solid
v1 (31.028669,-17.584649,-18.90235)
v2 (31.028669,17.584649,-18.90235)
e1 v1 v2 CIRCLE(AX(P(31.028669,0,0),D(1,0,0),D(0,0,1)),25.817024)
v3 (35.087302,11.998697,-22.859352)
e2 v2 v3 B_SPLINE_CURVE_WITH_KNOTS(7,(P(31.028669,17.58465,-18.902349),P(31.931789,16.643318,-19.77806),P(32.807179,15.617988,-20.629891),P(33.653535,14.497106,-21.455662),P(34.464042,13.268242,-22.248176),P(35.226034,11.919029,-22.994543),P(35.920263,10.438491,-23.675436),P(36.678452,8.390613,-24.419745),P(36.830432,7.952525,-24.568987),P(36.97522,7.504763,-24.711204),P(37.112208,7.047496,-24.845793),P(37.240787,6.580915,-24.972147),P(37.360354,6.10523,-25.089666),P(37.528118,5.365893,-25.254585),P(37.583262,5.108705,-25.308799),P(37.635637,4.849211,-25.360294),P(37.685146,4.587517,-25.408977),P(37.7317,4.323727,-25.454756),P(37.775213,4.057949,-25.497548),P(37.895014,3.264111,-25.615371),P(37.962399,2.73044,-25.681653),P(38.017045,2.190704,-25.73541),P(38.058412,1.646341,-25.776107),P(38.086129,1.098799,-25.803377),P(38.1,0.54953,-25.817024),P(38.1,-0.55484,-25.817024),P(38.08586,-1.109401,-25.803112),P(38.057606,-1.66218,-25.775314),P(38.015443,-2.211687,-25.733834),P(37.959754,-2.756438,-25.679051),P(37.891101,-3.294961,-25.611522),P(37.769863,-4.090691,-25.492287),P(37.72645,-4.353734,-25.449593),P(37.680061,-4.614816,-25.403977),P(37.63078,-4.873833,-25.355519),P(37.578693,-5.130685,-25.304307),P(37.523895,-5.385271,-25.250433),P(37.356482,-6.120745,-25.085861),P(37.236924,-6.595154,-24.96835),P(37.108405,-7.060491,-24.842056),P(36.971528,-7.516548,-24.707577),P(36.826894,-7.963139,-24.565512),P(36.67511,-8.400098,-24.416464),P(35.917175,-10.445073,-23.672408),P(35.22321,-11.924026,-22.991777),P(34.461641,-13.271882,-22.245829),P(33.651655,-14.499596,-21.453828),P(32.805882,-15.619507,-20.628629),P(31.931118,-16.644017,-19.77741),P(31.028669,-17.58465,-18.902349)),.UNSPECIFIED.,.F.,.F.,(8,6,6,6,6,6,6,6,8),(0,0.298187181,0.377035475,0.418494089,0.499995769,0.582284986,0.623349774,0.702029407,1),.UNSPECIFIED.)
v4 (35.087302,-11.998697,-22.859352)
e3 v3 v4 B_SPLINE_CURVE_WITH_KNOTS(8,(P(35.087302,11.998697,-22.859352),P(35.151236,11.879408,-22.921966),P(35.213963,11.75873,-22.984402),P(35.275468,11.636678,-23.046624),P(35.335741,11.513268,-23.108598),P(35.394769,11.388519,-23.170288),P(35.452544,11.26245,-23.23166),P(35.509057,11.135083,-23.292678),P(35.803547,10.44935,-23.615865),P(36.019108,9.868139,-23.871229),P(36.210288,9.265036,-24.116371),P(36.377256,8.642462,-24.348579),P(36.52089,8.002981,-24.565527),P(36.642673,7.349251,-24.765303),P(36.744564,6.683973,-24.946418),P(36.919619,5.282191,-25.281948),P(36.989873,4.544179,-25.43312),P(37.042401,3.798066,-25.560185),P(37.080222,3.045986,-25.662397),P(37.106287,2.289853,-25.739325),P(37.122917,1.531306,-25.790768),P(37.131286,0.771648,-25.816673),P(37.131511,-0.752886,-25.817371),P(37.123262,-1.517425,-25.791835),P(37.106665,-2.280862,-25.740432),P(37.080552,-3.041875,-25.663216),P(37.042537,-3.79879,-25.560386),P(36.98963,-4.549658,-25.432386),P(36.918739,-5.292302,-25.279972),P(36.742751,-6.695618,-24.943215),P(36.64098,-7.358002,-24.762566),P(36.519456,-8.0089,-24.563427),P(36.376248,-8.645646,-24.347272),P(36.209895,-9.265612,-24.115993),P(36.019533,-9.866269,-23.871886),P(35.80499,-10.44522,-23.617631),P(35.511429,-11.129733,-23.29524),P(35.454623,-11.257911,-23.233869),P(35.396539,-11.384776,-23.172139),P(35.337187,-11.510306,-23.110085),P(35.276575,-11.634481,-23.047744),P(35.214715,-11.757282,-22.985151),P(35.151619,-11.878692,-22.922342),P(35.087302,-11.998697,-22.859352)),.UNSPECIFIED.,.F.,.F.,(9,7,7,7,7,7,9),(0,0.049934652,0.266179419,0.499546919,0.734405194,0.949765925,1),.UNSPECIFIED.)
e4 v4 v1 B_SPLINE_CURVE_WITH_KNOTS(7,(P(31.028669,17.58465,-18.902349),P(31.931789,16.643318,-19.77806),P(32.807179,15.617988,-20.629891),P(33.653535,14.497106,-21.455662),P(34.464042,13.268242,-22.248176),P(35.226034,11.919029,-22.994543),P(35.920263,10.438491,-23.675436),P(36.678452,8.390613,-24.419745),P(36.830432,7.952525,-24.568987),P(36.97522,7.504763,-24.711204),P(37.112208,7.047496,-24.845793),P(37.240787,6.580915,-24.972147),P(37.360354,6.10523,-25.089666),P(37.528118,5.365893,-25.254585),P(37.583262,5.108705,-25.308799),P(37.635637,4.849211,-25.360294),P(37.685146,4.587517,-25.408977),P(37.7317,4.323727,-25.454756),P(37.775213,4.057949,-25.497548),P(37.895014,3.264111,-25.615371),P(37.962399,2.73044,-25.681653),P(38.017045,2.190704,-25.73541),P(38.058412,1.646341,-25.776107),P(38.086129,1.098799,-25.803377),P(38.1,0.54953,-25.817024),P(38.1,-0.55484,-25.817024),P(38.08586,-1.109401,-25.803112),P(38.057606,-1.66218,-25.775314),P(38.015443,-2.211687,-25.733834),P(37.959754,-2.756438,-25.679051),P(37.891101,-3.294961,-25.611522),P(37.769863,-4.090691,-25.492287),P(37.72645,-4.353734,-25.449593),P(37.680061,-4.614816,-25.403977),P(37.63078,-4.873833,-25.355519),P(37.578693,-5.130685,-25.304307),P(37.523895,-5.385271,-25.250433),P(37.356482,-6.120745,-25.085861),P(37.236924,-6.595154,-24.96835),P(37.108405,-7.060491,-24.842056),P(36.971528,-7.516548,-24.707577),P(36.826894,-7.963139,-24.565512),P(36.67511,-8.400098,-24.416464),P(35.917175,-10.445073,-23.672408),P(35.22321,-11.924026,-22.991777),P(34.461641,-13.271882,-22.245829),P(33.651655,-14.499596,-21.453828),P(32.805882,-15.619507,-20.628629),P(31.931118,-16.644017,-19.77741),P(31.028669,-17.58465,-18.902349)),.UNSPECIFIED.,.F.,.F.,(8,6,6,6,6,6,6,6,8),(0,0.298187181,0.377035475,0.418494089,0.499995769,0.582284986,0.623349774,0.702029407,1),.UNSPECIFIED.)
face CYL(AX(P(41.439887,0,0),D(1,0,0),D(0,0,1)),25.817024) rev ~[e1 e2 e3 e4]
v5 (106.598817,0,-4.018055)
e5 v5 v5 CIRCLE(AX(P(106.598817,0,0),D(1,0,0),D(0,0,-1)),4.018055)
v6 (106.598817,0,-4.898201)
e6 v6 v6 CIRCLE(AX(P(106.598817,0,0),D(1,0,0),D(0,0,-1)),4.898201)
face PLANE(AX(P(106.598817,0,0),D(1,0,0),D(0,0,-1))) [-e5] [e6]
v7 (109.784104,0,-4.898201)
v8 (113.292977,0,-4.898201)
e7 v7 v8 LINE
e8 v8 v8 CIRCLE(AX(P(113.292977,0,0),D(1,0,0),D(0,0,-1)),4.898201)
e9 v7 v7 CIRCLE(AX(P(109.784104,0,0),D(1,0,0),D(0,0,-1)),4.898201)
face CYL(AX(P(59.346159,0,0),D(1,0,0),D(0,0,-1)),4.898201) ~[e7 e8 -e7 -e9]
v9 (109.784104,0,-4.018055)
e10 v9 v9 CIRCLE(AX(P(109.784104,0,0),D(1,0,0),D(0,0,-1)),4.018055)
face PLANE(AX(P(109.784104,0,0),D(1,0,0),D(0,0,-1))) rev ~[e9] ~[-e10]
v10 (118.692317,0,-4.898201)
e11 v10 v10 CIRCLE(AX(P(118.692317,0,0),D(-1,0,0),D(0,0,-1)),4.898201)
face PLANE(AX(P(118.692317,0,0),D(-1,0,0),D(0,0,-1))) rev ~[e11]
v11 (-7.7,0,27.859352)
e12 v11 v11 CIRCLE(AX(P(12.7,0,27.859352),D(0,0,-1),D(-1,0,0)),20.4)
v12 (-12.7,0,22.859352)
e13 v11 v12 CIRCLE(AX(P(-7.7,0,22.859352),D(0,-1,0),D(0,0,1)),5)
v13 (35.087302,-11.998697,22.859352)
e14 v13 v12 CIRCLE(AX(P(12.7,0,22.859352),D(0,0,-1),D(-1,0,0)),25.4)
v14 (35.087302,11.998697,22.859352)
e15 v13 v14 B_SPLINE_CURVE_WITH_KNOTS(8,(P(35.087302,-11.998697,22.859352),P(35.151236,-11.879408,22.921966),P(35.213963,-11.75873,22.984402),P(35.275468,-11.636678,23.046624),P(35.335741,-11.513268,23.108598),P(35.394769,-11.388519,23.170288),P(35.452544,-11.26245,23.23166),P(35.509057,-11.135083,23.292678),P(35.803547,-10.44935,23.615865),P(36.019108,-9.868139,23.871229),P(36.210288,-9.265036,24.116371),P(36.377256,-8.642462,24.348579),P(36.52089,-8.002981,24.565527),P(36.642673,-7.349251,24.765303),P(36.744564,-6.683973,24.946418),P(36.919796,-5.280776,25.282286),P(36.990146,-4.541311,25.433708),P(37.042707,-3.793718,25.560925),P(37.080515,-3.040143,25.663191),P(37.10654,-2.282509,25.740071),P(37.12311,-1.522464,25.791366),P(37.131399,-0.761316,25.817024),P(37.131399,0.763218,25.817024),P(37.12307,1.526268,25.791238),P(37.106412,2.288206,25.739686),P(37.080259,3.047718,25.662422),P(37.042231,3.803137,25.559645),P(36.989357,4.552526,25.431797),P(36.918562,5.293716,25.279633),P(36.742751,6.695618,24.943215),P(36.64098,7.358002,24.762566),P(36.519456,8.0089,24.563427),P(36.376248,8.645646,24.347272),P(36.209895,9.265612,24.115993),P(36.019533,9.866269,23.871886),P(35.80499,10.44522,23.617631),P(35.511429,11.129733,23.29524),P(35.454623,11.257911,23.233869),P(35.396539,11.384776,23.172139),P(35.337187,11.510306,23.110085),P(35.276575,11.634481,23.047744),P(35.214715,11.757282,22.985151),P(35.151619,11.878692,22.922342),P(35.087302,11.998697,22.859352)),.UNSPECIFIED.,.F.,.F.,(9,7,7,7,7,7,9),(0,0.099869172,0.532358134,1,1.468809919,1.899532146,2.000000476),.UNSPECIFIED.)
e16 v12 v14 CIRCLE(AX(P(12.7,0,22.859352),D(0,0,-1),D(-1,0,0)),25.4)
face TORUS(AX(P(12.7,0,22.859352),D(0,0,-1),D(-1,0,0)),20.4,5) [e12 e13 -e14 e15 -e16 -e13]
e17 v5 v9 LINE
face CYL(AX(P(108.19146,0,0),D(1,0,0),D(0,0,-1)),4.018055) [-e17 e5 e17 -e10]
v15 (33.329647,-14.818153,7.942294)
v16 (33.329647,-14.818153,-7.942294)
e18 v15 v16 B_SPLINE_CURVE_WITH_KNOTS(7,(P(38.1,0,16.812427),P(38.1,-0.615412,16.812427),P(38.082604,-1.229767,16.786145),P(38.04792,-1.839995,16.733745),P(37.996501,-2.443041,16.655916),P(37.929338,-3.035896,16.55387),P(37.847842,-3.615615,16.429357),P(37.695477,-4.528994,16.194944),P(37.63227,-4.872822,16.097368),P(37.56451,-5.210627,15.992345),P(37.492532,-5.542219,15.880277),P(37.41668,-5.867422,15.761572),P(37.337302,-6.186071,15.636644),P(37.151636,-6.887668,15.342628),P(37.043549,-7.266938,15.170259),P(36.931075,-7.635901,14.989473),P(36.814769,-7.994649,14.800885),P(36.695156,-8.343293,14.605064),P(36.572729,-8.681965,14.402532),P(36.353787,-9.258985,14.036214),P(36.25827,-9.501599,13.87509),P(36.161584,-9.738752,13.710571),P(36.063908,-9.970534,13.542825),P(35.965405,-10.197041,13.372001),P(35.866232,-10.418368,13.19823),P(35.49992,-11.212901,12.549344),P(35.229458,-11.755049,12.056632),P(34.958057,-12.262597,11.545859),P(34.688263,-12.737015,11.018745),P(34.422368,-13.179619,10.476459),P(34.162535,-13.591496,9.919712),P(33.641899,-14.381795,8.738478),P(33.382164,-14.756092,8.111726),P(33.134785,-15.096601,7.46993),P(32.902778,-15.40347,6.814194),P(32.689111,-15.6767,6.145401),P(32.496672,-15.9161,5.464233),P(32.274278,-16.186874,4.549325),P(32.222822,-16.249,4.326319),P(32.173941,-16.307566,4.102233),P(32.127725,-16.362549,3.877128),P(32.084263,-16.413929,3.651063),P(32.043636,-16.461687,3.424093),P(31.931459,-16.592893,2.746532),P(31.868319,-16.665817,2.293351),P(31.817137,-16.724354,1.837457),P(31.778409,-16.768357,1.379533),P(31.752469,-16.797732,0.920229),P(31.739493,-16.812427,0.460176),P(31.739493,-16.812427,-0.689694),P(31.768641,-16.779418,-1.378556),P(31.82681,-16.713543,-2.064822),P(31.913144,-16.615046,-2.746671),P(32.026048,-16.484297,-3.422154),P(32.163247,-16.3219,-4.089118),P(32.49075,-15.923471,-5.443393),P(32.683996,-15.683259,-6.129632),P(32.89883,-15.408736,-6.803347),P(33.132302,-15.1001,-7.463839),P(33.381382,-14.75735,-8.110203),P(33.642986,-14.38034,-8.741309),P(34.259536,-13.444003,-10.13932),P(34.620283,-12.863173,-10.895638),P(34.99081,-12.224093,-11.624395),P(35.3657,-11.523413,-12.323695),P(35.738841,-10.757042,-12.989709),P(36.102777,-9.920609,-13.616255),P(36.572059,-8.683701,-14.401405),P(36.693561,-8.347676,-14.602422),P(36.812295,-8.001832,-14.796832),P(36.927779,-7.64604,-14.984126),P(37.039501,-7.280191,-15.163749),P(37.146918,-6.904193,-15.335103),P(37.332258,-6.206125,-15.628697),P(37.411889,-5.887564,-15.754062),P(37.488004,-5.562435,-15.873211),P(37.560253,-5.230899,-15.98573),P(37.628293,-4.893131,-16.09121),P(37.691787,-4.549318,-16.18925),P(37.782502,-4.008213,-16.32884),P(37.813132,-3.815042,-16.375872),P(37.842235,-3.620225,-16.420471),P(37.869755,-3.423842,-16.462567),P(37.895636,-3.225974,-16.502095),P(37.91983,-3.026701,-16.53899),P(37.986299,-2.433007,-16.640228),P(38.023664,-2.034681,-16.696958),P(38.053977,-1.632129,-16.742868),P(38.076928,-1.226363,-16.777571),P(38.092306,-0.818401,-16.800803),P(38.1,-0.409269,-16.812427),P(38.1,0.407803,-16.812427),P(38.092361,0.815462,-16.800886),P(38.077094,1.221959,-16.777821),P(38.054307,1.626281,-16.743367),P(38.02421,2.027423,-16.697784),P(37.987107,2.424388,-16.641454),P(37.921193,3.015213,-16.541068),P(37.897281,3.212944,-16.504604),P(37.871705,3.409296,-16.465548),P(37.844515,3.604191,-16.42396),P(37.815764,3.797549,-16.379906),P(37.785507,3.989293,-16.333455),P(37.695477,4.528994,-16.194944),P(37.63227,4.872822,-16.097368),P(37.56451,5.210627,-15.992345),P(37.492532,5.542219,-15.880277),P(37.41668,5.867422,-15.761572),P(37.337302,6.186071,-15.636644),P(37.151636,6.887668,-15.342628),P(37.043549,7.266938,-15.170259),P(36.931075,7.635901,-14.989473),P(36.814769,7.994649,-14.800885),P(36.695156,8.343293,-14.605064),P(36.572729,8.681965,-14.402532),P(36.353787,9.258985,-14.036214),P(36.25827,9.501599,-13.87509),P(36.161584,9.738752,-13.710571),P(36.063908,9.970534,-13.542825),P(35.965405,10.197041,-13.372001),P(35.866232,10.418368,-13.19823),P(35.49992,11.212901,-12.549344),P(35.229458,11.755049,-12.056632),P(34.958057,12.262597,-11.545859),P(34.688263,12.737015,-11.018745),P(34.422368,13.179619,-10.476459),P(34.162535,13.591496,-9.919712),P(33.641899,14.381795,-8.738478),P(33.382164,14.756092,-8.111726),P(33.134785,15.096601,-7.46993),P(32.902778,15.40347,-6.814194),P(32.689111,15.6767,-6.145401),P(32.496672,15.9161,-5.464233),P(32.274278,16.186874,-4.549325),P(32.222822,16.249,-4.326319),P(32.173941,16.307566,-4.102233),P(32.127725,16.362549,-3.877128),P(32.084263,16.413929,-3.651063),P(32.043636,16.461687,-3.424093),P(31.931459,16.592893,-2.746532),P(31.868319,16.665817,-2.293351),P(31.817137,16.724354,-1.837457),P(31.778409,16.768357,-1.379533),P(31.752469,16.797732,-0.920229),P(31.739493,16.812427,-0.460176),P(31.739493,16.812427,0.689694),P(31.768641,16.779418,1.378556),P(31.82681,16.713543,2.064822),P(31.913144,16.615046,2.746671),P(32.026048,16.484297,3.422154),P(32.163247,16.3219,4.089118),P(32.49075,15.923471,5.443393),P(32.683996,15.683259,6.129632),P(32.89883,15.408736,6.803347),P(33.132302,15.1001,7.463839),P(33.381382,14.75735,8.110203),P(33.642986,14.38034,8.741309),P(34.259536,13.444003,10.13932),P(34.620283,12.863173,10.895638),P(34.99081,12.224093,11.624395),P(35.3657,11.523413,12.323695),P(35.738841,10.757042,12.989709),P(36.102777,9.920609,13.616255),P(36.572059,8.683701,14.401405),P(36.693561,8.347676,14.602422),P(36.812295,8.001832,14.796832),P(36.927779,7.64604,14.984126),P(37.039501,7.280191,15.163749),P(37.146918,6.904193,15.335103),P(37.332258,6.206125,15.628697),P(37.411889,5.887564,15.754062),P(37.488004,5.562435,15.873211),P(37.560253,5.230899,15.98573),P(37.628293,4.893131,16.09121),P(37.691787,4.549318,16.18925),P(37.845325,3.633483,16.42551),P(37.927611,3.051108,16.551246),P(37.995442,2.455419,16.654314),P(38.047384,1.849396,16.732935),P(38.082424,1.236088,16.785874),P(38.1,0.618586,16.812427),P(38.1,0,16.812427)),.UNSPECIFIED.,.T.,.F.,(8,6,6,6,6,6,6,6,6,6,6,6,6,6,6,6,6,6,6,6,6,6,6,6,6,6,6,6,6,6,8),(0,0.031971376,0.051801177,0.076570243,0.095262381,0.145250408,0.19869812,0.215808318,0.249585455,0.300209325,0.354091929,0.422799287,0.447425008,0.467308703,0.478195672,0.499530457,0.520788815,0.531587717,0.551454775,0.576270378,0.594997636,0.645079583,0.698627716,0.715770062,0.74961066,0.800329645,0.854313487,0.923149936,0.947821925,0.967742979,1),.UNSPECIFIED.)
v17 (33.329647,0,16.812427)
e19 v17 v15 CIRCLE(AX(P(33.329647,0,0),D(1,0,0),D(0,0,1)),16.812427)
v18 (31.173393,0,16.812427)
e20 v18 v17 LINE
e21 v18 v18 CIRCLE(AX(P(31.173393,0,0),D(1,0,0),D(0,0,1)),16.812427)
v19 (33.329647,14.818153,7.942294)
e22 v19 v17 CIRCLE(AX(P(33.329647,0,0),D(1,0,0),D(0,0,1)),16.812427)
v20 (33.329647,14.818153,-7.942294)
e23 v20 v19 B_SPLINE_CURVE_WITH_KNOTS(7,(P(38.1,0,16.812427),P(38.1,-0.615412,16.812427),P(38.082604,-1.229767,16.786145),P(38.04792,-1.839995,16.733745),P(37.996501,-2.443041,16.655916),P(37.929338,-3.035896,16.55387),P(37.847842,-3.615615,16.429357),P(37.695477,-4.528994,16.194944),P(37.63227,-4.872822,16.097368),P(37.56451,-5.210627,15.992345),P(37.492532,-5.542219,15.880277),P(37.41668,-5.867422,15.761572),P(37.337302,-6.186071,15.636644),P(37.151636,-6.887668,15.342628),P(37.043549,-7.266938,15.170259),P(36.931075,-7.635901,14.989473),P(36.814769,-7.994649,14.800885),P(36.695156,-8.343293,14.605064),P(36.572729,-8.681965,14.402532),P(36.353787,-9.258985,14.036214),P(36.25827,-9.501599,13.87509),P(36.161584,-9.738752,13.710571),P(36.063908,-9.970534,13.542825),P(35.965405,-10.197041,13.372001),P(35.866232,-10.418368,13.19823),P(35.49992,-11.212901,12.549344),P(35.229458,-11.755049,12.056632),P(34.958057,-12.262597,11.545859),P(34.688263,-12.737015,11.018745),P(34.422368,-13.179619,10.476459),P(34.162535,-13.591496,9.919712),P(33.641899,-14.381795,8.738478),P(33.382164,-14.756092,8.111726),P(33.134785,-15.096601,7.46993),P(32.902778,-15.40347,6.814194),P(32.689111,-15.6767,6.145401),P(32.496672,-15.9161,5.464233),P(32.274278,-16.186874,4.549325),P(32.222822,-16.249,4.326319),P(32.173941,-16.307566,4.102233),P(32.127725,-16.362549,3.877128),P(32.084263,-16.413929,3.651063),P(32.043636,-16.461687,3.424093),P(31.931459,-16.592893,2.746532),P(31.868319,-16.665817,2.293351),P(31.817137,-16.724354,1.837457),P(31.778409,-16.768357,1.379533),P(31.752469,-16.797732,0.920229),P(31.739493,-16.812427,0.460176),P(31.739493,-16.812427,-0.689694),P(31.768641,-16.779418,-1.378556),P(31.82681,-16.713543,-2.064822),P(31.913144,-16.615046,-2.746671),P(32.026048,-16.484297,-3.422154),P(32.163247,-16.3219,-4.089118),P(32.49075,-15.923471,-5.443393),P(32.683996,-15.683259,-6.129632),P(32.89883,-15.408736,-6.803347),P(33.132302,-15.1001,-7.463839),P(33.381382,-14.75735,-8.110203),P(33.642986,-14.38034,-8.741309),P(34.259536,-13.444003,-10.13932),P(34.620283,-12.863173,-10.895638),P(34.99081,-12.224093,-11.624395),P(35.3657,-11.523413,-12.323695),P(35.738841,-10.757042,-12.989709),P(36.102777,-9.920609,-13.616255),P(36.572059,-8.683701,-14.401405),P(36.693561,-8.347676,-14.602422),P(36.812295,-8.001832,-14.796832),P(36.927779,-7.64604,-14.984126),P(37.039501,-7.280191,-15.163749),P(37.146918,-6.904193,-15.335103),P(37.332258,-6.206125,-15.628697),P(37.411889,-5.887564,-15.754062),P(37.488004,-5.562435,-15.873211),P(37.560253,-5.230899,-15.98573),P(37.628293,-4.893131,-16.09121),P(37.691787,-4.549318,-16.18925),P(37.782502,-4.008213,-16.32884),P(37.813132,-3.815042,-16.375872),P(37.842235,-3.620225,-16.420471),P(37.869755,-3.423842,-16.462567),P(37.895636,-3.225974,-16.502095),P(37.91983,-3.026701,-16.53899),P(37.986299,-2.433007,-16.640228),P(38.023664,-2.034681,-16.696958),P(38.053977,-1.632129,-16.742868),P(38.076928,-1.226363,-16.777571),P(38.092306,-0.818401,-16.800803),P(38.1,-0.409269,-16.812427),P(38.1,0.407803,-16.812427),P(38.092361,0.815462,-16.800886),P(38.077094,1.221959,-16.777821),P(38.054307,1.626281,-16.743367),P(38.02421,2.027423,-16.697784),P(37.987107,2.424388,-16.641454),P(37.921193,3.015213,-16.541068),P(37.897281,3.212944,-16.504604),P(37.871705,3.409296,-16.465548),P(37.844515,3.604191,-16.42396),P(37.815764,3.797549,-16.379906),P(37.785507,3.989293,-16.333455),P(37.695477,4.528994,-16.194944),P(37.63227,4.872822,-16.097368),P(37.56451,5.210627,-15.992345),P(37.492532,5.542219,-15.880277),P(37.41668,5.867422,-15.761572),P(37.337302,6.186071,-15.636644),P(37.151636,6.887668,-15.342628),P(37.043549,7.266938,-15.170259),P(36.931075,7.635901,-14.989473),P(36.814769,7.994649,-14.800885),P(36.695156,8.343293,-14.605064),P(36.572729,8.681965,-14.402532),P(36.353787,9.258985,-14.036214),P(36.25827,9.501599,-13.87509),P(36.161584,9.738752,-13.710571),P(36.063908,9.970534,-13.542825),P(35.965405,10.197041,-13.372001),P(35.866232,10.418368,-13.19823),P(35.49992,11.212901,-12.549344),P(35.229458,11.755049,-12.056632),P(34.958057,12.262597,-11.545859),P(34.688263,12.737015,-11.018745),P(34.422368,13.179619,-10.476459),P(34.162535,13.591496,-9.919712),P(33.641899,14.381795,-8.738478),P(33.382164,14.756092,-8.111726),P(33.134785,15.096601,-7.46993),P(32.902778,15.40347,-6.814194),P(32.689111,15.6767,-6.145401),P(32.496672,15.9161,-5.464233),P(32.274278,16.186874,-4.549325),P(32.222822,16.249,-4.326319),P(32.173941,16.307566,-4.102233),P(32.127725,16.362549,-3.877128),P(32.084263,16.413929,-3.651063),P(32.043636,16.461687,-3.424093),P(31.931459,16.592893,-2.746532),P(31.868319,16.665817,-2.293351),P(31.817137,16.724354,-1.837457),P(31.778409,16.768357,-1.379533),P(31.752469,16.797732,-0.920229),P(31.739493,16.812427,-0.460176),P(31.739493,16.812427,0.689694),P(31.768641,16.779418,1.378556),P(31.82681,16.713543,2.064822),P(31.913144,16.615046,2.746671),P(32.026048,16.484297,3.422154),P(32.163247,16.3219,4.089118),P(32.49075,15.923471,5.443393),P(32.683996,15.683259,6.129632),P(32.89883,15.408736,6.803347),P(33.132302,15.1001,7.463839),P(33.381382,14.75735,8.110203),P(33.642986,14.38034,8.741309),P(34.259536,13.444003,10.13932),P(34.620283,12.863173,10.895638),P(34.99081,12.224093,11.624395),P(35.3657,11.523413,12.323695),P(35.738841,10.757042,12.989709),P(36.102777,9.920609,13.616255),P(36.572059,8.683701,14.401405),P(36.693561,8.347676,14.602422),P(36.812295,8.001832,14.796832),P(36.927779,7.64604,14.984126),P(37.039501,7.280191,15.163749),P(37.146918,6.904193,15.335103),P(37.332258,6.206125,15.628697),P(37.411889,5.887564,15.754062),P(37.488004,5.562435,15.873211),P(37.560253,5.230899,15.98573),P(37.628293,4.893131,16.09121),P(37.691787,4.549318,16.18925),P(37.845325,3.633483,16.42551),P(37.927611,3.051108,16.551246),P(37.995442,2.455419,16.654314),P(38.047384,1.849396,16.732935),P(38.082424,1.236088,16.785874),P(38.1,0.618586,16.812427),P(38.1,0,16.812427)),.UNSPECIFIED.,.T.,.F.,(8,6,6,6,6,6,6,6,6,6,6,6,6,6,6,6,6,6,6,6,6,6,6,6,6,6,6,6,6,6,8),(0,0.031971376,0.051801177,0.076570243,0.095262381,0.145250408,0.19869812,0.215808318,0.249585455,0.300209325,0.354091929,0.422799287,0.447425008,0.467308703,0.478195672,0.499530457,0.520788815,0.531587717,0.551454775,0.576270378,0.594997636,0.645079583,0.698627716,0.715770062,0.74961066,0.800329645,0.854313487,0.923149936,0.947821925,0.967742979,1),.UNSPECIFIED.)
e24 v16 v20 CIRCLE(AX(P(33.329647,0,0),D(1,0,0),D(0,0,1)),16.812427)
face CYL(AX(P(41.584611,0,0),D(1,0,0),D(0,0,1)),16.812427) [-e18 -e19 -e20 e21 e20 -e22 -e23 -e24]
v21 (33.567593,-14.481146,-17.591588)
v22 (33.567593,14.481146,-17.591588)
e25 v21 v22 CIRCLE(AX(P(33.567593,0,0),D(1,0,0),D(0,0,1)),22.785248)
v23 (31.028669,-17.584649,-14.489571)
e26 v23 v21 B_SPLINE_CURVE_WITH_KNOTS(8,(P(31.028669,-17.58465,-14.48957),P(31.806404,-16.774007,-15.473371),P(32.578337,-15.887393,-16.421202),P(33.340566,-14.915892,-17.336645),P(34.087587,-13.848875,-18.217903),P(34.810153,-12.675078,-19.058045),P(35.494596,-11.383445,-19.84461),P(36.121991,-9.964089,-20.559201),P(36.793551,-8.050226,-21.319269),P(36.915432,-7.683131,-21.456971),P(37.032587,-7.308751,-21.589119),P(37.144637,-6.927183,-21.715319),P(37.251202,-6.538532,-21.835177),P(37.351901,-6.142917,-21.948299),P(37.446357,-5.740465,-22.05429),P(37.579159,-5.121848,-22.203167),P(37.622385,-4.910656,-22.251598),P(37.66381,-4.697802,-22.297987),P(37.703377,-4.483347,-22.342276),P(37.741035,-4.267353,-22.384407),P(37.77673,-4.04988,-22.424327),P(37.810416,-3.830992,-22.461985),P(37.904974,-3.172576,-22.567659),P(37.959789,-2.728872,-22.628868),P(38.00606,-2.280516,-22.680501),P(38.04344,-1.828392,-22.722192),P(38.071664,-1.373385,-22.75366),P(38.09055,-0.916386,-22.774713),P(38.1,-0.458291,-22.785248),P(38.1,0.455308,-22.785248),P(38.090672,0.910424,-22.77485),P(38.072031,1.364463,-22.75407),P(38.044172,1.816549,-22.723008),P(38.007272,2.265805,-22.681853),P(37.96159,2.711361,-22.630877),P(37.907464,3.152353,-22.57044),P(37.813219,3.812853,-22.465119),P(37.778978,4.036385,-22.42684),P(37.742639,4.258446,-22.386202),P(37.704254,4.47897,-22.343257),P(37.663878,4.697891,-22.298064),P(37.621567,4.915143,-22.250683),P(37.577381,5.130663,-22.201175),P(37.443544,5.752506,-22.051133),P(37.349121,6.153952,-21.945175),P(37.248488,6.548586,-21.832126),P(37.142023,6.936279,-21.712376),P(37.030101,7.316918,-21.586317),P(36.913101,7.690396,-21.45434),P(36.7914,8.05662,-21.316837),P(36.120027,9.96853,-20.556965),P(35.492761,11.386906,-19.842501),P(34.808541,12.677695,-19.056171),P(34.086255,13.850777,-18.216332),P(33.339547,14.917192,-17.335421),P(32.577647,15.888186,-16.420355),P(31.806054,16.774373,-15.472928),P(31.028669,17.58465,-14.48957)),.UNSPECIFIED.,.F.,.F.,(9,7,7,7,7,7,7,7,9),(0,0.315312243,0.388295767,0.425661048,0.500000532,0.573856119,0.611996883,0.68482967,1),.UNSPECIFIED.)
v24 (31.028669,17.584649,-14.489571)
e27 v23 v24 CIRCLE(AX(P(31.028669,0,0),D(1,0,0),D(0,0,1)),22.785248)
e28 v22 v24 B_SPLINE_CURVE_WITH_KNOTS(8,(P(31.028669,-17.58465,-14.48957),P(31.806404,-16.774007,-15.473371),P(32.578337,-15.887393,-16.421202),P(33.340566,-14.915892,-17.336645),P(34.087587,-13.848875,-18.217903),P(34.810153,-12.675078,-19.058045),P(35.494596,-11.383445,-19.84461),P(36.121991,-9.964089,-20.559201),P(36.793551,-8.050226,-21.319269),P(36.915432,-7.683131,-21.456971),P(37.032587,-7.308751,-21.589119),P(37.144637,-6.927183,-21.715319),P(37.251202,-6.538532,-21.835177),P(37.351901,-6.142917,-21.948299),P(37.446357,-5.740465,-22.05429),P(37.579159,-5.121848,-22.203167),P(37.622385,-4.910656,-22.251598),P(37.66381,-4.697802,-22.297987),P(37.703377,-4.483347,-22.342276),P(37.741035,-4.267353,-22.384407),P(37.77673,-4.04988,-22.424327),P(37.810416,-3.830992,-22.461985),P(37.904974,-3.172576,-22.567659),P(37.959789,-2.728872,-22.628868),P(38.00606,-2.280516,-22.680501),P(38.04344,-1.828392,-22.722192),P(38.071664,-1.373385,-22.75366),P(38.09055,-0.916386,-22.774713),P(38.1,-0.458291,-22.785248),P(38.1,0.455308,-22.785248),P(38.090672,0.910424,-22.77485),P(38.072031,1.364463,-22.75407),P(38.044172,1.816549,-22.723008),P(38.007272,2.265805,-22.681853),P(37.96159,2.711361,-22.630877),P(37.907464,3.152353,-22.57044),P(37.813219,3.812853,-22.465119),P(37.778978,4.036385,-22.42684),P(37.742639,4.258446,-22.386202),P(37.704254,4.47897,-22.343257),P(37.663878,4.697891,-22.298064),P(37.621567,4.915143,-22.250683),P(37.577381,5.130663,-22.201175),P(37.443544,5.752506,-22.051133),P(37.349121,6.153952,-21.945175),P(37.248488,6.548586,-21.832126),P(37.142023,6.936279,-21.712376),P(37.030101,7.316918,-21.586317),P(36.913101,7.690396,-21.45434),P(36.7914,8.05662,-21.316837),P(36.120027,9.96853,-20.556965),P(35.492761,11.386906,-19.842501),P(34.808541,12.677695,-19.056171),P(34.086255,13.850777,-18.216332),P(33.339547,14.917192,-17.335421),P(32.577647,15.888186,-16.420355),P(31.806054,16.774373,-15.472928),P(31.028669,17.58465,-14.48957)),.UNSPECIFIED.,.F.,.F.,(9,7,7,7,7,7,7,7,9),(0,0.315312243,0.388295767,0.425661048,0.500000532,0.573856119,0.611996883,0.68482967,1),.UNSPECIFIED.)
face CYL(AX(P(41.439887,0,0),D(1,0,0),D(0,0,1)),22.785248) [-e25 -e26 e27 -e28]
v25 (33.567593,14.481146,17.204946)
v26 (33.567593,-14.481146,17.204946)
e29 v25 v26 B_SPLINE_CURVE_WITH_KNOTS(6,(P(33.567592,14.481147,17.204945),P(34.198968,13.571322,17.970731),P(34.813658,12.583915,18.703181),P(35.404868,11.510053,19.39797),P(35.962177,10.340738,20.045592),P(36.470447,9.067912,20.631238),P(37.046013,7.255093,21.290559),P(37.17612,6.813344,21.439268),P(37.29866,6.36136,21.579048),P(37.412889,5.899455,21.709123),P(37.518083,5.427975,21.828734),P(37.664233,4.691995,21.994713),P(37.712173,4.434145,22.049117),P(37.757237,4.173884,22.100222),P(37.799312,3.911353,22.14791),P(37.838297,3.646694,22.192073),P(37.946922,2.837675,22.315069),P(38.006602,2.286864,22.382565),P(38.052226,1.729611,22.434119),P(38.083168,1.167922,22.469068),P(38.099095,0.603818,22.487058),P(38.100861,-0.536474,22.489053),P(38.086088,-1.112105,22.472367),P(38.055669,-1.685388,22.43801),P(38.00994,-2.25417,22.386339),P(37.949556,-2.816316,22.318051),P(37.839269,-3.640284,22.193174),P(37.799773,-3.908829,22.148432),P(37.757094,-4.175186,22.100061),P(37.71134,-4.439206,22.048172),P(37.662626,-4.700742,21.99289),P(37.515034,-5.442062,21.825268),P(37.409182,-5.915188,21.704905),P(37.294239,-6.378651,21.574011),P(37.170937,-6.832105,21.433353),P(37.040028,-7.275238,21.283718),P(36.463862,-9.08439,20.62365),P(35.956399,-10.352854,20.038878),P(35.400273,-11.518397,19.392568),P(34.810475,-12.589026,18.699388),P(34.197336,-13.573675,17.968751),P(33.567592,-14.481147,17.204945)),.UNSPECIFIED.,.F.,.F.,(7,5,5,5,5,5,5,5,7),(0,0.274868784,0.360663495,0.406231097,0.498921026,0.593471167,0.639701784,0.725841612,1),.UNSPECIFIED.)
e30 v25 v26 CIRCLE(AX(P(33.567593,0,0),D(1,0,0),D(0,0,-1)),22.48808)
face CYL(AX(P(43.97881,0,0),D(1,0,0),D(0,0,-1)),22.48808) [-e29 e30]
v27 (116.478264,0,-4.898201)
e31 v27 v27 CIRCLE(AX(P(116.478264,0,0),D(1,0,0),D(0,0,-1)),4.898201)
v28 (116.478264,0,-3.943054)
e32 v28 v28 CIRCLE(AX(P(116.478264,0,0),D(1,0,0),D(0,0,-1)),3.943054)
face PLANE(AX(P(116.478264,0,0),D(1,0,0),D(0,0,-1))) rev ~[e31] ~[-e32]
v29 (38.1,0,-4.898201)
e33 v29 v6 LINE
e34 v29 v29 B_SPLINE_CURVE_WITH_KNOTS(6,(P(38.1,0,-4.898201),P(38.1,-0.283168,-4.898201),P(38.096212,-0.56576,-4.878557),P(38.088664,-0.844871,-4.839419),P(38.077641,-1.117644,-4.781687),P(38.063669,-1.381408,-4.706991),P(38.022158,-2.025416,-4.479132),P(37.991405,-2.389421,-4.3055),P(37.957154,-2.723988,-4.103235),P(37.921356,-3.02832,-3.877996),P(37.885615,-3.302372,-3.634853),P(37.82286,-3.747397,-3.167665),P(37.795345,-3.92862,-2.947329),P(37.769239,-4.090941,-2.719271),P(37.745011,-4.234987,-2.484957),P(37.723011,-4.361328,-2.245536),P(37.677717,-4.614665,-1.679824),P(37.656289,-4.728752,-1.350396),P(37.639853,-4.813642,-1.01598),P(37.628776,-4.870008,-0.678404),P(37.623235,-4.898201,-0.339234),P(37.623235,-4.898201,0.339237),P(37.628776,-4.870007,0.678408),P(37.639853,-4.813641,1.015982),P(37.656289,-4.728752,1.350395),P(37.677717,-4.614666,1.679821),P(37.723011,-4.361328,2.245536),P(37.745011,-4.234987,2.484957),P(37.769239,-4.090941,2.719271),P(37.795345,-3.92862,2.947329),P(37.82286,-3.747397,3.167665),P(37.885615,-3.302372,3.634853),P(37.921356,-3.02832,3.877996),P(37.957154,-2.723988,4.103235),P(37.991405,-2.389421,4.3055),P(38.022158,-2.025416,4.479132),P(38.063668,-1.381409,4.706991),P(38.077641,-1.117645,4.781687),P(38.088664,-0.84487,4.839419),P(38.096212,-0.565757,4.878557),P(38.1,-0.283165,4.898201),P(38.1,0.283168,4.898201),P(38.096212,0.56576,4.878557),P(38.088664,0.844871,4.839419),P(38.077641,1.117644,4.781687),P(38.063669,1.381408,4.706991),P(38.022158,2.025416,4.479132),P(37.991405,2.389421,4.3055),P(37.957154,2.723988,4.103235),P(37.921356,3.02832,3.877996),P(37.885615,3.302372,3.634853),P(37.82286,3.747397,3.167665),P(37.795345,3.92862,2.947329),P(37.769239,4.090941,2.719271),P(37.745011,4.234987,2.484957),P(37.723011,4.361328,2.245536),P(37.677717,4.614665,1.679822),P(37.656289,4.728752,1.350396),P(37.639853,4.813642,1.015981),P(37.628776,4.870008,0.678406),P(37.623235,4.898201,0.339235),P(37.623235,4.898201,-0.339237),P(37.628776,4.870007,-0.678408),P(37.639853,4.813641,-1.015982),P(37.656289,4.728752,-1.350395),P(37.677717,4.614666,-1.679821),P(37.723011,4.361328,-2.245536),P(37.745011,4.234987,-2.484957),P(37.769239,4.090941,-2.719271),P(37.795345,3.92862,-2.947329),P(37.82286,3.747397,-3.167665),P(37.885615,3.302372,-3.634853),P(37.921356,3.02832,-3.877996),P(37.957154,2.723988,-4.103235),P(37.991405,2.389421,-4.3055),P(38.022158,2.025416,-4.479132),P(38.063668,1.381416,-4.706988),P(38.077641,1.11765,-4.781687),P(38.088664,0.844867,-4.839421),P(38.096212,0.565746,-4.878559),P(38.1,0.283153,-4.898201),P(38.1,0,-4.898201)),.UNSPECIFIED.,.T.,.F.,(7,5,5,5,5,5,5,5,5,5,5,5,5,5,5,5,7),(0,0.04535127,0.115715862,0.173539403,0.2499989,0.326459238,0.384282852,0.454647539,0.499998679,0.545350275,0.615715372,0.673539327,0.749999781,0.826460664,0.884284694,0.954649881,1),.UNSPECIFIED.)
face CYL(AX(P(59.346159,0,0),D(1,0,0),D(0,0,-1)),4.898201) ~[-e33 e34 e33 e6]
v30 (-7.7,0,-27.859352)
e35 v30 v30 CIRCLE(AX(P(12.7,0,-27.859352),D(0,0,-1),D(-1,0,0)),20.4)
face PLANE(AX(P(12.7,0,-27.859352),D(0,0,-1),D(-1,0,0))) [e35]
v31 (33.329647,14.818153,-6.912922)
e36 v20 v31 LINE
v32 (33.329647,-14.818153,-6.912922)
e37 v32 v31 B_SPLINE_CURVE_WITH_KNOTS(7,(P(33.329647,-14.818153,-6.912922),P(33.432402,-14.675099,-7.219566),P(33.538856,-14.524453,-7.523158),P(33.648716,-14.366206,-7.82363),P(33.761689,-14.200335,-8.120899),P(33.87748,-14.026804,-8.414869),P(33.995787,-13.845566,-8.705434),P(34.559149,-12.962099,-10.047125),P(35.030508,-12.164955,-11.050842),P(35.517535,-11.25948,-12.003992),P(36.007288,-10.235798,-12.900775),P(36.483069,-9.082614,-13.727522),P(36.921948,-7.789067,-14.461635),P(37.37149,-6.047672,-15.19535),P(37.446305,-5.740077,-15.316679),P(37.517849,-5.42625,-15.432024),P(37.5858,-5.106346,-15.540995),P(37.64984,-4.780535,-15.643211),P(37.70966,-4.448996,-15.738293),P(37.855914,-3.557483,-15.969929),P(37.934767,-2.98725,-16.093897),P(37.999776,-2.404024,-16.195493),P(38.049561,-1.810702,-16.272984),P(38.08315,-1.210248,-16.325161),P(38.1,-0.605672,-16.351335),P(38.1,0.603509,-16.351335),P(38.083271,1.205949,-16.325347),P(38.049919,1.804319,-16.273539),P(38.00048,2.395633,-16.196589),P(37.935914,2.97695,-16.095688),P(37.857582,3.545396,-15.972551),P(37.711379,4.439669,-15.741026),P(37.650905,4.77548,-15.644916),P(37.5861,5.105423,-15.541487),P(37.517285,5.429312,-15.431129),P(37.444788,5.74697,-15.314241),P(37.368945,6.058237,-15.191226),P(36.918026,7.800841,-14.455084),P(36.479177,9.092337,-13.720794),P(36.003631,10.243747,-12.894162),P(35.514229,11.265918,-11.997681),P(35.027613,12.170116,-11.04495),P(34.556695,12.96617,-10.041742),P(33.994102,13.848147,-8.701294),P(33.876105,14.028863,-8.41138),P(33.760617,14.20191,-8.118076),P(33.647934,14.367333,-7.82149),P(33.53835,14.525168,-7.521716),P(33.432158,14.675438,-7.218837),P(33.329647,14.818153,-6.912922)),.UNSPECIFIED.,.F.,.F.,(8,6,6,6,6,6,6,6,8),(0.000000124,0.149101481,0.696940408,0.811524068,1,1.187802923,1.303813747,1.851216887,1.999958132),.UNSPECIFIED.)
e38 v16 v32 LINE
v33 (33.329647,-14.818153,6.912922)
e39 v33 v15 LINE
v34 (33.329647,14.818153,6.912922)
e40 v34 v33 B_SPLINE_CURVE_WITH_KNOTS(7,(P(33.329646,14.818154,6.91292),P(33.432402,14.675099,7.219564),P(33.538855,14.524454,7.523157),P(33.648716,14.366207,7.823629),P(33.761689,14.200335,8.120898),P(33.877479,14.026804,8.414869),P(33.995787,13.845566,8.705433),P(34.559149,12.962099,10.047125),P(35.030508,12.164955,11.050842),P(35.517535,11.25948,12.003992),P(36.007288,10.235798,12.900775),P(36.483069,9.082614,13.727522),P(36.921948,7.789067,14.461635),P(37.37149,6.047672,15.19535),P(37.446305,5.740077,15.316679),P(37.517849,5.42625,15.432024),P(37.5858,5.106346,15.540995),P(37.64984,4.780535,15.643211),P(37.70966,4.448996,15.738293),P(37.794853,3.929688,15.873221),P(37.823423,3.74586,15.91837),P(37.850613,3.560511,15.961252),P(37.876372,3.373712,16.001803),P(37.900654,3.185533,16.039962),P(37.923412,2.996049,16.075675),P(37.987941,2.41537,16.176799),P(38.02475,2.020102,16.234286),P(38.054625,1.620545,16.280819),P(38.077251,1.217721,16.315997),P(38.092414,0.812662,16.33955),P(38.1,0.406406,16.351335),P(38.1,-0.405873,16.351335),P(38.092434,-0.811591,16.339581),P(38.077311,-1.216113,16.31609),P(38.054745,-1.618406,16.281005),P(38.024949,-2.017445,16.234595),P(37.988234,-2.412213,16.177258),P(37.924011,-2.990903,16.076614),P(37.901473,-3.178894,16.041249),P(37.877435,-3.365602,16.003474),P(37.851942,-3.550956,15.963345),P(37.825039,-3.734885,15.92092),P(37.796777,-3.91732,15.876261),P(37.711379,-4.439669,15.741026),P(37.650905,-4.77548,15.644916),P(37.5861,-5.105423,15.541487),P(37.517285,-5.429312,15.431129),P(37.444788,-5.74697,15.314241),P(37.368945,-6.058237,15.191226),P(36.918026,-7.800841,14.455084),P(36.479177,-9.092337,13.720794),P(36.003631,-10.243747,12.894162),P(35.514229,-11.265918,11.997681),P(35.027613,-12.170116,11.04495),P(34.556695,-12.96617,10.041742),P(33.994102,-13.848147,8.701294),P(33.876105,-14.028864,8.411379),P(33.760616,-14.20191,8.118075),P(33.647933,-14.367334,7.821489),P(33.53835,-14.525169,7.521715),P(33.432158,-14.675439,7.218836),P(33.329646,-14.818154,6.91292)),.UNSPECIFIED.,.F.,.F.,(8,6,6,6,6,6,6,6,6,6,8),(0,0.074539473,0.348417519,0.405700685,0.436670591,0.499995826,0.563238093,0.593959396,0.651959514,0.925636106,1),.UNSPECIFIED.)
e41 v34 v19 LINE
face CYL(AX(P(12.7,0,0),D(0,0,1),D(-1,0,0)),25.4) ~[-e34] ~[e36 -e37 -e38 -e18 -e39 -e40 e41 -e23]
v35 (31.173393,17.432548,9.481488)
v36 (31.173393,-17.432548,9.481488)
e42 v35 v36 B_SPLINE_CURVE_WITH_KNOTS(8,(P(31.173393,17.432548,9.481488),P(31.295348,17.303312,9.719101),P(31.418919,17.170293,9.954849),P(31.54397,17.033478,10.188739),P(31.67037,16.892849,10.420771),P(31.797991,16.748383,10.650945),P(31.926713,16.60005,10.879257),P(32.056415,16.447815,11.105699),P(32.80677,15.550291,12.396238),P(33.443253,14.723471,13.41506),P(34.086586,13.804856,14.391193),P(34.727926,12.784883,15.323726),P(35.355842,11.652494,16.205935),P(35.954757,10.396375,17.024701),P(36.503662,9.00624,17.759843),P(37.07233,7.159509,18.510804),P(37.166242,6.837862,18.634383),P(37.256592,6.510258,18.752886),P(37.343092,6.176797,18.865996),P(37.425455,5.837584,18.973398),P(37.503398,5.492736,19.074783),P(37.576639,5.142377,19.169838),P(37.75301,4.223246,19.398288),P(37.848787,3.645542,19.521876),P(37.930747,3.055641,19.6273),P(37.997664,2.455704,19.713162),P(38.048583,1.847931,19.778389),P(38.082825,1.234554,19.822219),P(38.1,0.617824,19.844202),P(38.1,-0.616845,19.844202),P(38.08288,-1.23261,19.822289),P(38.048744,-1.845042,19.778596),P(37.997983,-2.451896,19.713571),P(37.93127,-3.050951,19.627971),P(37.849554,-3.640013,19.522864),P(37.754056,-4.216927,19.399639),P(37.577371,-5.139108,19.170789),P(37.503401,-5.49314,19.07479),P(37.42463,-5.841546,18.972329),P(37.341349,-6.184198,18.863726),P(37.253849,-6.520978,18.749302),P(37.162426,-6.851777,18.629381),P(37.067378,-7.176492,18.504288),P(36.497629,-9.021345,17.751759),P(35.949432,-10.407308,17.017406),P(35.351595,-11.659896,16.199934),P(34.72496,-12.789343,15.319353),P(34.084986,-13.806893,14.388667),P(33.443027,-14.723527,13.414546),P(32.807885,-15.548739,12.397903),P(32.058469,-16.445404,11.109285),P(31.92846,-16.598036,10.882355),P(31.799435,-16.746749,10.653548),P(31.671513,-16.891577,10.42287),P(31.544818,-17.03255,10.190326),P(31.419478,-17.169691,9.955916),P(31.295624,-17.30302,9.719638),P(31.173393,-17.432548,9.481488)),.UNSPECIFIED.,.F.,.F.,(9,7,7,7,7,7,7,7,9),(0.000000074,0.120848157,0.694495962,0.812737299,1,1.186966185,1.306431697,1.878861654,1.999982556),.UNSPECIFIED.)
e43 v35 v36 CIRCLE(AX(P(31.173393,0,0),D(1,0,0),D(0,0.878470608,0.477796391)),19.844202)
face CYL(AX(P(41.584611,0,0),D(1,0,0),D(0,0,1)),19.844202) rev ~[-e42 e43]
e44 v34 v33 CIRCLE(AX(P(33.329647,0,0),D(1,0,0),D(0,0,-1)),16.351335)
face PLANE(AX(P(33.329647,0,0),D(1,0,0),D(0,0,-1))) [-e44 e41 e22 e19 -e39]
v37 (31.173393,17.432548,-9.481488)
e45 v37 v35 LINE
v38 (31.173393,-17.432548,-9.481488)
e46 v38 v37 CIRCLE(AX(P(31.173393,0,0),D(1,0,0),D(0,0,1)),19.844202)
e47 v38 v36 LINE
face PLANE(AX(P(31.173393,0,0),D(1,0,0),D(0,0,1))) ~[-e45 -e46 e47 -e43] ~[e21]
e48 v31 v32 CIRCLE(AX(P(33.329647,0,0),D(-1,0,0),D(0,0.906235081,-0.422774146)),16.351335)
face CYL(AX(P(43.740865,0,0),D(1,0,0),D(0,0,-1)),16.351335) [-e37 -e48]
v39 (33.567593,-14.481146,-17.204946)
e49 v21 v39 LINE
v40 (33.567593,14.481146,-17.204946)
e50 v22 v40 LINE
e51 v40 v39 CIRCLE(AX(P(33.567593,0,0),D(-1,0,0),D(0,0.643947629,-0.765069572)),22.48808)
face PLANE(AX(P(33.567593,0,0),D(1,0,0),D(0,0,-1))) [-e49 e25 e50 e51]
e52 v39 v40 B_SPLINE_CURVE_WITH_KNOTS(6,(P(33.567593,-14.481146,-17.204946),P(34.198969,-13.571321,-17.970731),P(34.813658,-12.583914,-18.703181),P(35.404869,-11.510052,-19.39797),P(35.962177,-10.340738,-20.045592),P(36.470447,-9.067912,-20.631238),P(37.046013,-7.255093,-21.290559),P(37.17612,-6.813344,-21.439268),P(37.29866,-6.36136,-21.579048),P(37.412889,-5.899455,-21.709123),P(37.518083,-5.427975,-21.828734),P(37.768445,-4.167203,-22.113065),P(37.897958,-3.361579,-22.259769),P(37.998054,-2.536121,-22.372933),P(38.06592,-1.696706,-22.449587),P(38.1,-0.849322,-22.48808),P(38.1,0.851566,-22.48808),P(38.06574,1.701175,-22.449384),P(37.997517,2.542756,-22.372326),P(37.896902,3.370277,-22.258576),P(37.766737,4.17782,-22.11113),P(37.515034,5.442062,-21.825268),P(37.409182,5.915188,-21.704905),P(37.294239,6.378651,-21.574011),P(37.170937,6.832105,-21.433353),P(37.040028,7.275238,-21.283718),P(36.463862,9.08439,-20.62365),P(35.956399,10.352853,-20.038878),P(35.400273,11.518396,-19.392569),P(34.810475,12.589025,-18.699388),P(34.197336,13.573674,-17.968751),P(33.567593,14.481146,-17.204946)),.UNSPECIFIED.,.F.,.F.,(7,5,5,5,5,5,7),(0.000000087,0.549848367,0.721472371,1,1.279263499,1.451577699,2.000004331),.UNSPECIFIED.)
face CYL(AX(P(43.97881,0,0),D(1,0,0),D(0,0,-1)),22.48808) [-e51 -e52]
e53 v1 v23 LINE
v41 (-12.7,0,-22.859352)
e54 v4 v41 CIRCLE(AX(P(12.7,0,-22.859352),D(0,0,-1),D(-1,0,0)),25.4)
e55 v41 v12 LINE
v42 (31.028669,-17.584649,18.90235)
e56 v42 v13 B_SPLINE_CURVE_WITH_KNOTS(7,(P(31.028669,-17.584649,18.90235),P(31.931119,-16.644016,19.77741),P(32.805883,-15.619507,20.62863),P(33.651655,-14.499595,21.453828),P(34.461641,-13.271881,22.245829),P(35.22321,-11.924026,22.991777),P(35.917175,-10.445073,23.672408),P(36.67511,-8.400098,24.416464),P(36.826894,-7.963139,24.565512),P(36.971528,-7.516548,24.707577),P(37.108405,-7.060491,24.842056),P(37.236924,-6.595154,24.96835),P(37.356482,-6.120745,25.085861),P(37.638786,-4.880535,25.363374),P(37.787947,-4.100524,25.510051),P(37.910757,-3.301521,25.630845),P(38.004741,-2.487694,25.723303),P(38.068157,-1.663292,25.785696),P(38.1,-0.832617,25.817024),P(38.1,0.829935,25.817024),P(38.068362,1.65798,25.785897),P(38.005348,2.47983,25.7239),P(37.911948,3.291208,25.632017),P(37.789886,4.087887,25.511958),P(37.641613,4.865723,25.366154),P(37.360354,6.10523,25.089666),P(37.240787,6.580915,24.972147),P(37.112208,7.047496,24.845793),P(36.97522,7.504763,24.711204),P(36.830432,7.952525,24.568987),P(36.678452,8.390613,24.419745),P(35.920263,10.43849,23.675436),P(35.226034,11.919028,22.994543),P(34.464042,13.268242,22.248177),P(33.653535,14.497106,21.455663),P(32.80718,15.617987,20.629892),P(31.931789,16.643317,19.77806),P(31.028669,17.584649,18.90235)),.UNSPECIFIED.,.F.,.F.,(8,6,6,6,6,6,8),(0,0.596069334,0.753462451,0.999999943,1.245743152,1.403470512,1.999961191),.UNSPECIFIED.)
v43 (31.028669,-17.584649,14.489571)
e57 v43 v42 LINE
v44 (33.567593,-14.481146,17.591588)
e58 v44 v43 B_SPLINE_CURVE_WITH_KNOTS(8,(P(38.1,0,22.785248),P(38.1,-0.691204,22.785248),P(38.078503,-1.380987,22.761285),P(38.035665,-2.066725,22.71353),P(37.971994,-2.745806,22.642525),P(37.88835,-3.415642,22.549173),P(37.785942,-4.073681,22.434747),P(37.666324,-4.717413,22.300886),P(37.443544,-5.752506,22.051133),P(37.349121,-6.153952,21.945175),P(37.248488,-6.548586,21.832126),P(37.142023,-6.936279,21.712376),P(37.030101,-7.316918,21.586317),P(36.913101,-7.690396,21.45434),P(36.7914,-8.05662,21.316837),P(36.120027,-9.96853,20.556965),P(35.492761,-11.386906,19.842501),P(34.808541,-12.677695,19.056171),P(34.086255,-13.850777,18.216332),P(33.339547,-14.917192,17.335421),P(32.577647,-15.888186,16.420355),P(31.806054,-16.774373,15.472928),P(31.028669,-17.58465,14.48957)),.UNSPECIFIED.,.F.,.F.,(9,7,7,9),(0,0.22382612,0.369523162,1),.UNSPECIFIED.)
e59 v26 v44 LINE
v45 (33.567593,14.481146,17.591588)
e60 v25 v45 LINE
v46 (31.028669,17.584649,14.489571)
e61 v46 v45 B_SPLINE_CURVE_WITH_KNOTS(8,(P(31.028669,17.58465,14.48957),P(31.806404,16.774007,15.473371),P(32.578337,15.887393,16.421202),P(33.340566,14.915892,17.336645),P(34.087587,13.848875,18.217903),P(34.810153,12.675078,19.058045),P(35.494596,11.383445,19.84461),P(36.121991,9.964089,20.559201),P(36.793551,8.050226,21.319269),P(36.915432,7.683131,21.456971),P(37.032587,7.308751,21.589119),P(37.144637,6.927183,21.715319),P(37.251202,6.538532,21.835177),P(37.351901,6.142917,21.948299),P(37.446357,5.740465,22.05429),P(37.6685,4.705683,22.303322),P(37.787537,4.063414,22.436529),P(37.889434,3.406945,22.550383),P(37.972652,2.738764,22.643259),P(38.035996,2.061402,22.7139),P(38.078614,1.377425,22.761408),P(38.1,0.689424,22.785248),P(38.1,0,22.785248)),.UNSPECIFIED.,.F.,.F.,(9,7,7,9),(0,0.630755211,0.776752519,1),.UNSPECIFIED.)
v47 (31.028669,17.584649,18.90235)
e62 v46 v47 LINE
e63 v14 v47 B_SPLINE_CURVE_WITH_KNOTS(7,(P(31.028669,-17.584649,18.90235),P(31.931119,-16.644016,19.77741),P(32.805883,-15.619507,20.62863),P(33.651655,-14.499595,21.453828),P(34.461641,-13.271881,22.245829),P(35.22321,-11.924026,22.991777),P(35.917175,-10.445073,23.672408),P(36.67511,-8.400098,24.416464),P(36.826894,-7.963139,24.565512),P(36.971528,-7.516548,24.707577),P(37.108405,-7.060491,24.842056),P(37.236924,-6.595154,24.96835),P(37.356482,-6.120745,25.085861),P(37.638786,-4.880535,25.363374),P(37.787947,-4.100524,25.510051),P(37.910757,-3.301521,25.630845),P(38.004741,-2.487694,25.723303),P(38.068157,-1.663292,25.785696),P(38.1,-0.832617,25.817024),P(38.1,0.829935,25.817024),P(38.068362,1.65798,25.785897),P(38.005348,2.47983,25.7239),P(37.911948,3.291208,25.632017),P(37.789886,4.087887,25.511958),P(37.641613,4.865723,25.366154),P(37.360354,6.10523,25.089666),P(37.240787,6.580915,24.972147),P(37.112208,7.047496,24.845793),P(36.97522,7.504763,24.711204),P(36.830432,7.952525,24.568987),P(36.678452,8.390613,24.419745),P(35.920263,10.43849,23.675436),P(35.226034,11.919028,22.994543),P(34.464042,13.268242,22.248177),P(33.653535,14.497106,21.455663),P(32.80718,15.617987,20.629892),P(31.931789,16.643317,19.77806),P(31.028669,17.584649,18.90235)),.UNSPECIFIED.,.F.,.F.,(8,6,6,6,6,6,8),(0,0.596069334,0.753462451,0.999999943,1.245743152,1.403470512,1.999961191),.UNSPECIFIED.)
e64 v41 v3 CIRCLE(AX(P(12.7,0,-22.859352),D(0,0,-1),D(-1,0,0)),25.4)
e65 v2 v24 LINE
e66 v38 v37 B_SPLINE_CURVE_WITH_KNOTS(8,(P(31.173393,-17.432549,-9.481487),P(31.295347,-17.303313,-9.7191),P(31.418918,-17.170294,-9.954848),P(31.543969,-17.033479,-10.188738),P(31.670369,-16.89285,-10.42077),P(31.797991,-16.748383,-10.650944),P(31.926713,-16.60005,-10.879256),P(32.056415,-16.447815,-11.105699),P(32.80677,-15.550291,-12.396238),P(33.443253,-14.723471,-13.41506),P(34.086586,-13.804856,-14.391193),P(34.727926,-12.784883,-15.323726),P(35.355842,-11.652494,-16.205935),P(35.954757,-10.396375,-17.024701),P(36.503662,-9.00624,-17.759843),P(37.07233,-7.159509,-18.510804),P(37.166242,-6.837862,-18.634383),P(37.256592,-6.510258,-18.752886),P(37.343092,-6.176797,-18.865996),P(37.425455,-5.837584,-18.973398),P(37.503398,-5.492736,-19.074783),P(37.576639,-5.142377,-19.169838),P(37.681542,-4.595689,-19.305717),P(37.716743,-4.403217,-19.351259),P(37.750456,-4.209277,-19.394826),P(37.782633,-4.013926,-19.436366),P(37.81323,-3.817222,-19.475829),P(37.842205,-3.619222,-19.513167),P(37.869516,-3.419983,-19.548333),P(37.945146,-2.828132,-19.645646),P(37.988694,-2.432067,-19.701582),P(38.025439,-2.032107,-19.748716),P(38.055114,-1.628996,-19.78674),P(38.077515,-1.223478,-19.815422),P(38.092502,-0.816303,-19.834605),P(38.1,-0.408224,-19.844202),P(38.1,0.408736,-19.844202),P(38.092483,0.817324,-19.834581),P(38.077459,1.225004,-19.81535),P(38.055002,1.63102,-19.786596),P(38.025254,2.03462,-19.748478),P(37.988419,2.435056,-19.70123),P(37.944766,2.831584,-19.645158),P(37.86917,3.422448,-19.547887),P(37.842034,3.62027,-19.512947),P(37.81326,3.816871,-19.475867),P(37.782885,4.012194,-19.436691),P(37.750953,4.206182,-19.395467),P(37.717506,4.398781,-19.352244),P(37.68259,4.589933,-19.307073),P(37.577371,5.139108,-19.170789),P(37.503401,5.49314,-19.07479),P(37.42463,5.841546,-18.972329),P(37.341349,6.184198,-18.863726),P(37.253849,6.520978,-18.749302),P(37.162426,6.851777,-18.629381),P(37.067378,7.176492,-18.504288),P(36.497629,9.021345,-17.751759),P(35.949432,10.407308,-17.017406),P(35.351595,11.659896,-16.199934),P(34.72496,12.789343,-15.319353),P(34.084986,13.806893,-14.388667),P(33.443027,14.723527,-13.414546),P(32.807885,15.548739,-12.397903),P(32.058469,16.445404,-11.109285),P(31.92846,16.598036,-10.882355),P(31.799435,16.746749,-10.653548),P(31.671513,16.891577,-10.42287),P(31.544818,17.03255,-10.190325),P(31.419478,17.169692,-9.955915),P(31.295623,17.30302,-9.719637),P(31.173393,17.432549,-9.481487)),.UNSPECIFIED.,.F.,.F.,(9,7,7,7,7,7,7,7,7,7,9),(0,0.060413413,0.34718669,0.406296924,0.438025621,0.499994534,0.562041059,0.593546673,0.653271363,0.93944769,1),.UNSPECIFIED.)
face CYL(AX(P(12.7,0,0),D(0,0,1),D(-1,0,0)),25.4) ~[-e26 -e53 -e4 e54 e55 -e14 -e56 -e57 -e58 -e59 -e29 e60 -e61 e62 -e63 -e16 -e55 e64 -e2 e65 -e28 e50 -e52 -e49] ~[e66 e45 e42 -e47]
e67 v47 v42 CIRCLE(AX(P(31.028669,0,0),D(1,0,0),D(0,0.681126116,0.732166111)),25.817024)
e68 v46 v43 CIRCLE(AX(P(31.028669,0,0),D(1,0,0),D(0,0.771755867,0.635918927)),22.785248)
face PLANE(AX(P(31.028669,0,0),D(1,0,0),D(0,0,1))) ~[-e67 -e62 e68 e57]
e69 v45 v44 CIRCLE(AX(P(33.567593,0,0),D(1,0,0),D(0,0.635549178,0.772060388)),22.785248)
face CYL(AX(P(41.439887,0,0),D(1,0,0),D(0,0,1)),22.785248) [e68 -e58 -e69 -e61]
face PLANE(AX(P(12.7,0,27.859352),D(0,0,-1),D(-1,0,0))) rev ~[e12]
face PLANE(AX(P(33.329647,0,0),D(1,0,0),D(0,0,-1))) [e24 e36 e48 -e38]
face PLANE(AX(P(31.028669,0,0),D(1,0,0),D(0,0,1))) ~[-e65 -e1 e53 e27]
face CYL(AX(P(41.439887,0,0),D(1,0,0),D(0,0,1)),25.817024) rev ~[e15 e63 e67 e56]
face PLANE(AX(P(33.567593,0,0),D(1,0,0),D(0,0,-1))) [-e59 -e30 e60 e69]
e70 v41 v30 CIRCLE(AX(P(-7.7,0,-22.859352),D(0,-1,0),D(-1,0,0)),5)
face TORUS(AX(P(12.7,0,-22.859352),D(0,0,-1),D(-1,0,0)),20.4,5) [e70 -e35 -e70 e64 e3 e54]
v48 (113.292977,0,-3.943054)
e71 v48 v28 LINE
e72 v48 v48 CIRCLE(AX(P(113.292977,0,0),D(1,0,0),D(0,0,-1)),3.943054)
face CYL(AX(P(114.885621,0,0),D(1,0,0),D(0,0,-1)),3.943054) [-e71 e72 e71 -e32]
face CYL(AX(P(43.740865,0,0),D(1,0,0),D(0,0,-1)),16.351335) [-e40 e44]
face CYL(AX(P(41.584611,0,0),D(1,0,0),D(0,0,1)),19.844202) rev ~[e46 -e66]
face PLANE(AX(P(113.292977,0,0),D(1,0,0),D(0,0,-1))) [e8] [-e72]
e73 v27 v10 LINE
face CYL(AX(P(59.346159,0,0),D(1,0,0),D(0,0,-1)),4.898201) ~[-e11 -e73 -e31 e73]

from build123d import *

# Parameters (mm, degrees)
F0_W   = 25.4
F0_H   = 55.7187045847
F2_W   = 118.6923170462
F2_H   = 4.8982012086
F4_W   = 3.185287118
F4_H   = 12.2274383903
F4_W_2 = 20.8224356174
F4_H_2 = 3.0317753553


# Not quite as in the source:
# - a fillet or chamfer that OpenCascade refuses, or shapes differently, is made with other operations: its cross-section is extruded or revolved along the edge and cut away or added


with BuildPart() as f1:
    # F0 (on Front) → F1 (revolve)
    with BuildSketch(Plane.XZ):
        Rectangle(F0_W, F0_H)
    revolve(axis=Axis((12.7, 0, 0), (0, 0, -1)))

    # F2 (on Front) → F3 (revolve)
    with BuildSketch(Plane.XZ):
        with Locations((59.3461585231, -2.4491006043)):
            Rectangle(F2_W, F2_H)
    revolve(axis=Axis((59.3461585231, 0, 0), (-1, 0, 0)))

    # F4 (on Front) → F6 (revolve, cut)
    with BuildSketch(Plane.XZ):
        with Locations((114.8856207728, -10.0567732006)):
            Rectangle(F4_W, F4_H)
        with Locations((108.191460371, -10.1317744702)):
            Rectangle(F4_W, F4_H)
        with Locations((43.9788103104, -24.0039676428)):
            Rectangle(F4_W_2, F4_H_2)
        with Locations((43.7408648431, -17.8672224283)):
            Rectangle(F4_W_2, F4_H_2)
        with Locations((41.584610939, 18.3283146471)):
            Rectangle(F4_W_2, F4_H_2)
        with Locations((41.4398871362, 24.3011359125)):
            Rectangle(F4_W_2, F4_H_2)
    revolve(axis=Axis((52.5897778571, 0, 0), (1, 0, 0)), mode=Mode.SUBTRACT)

    # F7: fillet of radius 5 on 1 edges, made by hand

    # F7_s1 → F7_t2 (revolve, cut)
    with BuildSketch(Plane.XZ):
        with BuildLine():
            ThreePointArc((-12.7, -22.8593522923), (-11.2355339059, -26.3948861983), (-7.7, -27.8593522923))
            Line((-7.7, -27.8593522923), (-12.7, -27.8593522923))
            Line((-12.7, -27.8593522923), (-12.7, -22.8593522923))
        make_face()
    revolve(axis=Axis((12.7, 0, -27.8593522923), (0, 0, -1)), mode=Mode.SUBTRACT)

    # F8: fillet of radius 5 on 1 edges, made by hand

    # F8_s1 → F8_t2 (revolve, cut)
    with BuildSketch(Plane.XZ):
        with BuildLine():
            ThreePointArc((-7.7, 27.8593522923), (-11.2355339059, 26.3948861983), (-12.7, 22.8593522923))
            Line((-12.7, 22.8593522923), (-12.7, 27.8593522923))
            Line((-12.7, 27.8593522923), (-7.7, 27.8593522923))
        make_face()
    revolve(axis=Axis((12.7, 0, 27.8593522923), (0, 0, -1)), mode=Mode.SUBTRACT)


solid = f1.part
